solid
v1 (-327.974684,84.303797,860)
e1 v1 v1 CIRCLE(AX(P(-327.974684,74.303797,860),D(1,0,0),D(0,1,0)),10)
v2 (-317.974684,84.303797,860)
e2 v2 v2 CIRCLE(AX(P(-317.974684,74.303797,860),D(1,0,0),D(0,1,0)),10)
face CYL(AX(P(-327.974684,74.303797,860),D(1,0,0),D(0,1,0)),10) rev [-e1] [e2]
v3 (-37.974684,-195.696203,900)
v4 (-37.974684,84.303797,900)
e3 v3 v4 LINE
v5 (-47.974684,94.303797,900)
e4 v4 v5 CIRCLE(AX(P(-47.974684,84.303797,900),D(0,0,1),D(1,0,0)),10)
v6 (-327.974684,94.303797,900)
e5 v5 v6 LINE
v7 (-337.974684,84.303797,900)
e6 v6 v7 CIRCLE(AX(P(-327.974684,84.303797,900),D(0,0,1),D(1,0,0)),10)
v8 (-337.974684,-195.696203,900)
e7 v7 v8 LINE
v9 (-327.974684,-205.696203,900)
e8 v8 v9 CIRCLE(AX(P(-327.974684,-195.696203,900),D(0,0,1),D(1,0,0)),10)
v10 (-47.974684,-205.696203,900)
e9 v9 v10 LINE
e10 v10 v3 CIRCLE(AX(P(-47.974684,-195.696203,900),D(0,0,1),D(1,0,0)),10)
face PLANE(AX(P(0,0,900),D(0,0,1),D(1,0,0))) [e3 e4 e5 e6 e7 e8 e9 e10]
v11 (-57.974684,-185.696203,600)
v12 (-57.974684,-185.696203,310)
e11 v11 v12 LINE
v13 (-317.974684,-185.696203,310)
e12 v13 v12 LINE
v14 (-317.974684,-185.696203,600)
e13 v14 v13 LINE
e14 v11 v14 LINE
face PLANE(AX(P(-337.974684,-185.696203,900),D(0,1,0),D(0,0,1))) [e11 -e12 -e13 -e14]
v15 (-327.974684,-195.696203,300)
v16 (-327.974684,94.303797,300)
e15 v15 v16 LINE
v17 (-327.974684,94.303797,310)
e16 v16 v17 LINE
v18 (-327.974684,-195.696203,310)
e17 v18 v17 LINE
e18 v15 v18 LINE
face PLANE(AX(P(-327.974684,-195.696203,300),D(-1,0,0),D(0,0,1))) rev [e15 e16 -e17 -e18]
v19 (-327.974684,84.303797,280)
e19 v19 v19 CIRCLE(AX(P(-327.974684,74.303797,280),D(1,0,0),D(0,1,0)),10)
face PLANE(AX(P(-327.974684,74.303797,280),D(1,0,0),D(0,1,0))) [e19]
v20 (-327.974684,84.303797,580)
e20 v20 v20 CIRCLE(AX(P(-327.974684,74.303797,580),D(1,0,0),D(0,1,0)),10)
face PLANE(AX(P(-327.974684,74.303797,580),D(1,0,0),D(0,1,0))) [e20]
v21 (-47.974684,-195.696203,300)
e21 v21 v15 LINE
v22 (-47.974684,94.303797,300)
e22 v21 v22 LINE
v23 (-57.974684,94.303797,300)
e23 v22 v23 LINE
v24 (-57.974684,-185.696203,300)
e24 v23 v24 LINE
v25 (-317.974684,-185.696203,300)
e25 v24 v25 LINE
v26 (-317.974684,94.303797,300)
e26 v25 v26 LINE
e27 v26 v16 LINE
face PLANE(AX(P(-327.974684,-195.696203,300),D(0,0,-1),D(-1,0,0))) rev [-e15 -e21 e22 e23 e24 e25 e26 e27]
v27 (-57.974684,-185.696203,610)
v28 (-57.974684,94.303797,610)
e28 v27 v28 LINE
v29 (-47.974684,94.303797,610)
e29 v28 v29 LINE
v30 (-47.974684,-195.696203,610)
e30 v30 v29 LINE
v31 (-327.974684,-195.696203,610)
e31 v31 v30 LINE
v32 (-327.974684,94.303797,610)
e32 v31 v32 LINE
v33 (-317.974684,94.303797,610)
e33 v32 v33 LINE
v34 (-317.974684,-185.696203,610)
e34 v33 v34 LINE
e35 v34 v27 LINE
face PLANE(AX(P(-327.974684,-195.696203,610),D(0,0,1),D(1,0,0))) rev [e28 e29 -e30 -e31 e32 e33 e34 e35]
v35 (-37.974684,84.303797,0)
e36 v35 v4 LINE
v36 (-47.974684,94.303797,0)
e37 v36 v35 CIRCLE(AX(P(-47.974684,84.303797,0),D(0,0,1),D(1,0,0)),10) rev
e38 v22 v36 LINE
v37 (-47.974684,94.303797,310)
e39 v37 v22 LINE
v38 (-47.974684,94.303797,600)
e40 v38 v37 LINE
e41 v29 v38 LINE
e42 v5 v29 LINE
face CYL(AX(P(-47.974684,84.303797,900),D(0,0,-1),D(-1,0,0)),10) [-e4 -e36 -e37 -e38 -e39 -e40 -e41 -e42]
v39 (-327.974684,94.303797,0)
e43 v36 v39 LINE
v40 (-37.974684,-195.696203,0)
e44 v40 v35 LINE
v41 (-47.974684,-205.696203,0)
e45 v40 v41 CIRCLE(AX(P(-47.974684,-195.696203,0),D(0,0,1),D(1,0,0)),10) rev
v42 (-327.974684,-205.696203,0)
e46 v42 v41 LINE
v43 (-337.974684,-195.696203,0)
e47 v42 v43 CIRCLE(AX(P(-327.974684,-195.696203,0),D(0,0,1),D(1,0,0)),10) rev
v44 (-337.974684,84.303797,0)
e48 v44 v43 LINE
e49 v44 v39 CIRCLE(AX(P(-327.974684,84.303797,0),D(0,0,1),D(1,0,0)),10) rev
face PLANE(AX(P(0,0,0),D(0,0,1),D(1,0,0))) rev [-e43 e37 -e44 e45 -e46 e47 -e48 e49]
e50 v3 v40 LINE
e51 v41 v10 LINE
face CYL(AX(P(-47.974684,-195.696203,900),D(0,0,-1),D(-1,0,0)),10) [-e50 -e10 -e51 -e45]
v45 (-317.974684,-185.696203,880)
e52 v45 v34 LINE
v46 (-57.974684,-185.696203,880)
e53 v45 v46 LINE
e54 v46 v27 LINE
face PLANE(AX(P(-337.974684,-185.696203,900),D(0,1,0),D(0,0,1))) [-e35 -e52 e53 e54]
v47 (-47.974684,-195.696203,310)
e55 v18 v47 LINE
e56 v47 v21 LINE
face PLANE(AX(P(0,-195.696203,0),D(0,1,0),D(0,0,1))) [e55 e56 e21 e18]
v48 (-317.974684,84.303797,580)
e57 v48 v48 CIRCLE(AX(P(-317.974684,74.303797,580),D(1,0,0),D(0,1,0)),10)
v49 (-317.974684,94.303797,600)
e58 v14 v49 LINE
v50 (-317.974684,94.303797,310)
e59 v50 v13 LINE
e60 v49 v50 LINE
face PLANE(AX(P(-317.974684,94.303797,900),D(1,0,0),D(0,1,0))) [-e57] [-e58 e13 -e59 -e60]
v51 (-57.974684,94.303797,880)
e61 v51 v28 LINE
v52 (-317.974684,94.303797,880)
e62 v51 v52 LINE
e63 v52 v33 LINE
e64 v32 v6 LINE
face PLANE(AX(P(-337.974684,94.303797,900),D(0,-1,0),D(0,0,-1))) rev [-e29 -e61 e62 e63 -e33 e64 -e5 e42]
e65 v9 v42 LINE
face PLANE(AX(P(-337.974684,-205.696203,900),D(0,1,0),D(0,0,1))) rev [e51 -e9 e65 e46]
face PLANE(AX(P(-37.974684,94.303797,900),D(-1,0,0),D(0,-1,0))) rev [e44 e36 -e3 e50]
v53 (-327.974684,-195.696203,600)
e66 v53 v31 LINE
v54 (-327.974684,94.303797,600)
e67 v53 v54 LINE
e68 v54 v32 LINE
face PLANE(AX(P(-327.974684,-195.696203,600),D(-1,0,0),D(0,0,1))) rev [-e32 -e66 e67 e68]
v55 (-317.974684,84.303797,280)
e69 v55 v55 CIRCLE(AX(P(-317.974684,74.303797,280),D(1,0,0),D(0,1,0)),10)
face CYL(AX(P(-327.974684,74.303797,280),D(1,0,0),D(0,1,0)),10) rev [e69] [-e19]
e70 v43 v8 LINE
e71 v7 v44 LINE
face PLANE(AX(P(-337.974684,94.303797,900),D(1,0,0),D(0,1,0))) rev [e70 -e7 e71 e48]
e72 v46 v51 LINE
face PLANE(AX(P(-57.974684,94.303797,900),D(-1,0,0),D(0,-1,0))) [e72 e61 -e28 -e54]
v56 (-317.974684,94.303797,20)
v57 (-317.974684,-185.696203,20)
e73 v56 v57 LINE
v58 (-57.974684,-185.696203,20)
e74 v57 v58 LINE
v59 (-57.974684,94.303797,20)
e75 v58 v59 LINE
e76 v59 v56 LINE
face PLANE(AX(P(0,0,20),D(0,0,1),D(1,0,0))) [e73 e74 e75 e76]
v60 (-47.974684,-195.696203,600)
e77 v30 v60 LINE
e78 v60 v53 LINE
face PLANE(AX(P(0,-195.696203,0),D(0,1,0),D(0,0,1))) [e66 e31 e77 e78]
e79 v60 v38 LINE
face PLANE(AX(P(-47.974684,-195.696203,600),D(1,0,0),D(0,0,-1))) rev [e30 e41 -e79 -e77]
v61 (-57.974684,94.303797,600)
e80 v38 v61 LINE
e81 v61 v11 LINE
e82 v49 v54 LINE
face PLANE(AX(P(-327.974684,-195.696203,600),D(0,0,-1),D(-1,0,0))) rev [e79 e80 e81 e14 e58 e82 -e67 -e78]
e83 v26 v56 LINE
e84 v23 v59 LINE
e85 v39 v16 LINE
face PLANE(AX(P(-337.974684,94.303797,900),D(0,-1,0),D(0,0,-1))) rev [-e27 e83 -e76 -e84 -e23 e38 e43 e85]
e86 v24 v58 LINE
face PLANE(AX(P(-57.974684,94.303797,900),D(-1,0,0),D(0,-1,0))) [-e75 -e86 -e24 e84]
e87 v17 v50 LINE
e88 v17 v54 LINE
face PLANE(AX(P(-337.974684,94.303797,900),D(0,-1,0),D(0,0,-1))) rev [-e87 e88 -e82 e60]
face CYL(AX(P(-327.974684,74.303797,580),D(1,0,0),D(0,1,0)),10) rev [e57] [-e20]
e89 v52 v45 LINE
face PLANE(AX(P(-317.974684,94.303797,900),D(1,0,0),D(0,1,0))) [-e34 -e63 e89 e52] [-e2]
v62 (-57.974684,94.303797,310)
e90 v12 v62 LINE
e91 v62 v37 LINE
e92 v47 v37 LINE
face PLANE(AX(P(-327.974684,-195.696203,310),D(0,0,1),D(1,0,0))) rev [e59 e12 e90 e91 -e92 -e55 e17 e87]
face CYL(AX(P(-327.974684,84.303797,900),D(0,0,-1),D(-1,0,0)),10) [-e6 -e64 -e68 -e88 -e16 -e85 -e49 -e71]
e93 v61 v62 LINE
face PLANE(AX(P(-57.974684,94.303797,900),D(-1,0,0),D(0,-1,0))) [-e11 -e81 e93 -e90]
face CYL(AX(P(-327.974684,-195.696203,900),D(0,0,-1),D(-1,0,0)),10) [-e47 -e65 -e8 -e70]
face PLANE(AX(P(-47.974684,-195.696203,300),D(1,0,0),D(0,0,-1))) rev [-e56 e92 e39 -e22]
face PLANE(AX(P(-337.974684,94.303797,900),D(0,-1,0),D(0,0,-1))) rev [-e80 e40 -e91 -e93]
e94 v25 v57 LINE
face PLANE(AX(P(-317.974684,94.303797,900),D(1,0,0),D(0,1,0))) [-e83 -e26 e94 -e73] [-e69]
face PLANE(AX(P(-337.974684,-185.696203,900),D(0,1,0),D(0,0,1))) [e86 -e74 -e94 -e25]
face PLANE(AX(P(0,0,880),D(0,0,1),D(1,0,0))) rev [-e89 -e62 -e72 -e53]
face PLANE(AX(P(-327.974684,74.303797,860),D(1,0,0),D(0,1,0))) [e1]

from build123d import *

# Parameters (mm, degrees)
SKETCH1_W           = 300
SKETCH1_H           = 300
BOSS_EXTRUDE1_DEPTH = 900
SHELL1_T            = -20
SKETCH2_W           = 280
SKETCH2_H           = 10
CUT_EXTRUDE1_DEPTH  = 290
SKETCH3_R           = 10
CUT_EXTRUDE2_DEPTH  = 10
FILLET1_START       = -1
FILLET1_DEPTH       = 902


with BuildPart() as part:
    # Sketch1 → Boss-Extrude1 (new body)
    with BuildSketch(Plane.XY):
        with Locations((-187.974683544, -55.696202532)):
            Rectangle(SKETCH1_W, SKETCH1_H)
    extrude(amount=BOSS_EXTRUDE1_DEPTH)

    # Shell1
    shell1_openings = [part.faces().sort_by_distance(p)[0] for p in [
        (-187.974683544, 94.303797468, 450),
    ]]
    offset(amount=SHELL1_T, openings=shell1_openings, kind=Kind.INTERSECTION)

    # Sketch2 → Cut-Extrude1 (cut)
    with BuildSketch(Plane(origin=(0, 94.303797468, 0), x_dir=(1, 0, 0), z_dir=(0, 1, 0))):
        with Locations((-187.974683544, -305)):
            Rectangle(SKETCH2_W, SKETCH2_H)
        with Locations((-187.974683544, -605)):
            Rectangle(SKETCH2_W, SKETCH2_H)
    extrude(amount=-CUT_EXTRUDE1_DEPTH, mode=Mode.SUBTRACT)

    # Sketch3 → Cut-Extrude2 (cut)
    with BuildSketch(Plane(origin=(-317.974683544, 0, 0), x_dir=(0, 0, -1), z_dir=(1, 0, 0))):
        with Locations(Location((-580, 74.303797468, 0), (0, 0, 90))):
            Circle(SKETCH3_R)
        with Locations(Location((-280, 74.303797468, 0), (0, 0, 90))):
            Circle(SKETCH3_R)
        with Locations(Location((-860, 74.303797468, 0), (0, 0, 90))):
            Circle(SKETCH3_R)
    extrude(amount=-CUT_EXTRUDE2_DEPTH, mode=Mode.SUBTRACT)

    # Fillet1: read off the stored shape, not the designer's step
    # Fillet1 outline → Fillet1 (cut)
    with BuildSketch(Plane.XY.offset(FILLET1_START)):
        with BuildLine():
            Line((-37.974683544, 94.303797468), (-47.974683544, 94.303797468))
            ThreePointArc((-47.974683544, 94.303797468), (-40.903615732, 91.37486528), (-37.974683544, 84.303797468))
            Line((-37.974683544, 84.303797468), (-37.974683544, 94.303797468))
        make_face()
        with BuildLine():
            Line((-37.974683544, -205.696202532), (-37.974683544, -195.696202532))
            ThreePointArc((-37.974683544, -195.696202532), (-40.903615732, -202.767270344), (-47.974683544, -205.696202532))
            Line((-47.974683544, -205.696202532), (-37.974683544, -205.696202532))
        make_face()
        with BuildLine():
            ThreePointArc((-337.974683544, 84.303797468), (-335.045751356, 91.37486528), (-327.974683544, 94.303797468))
            Line((-327.974683544, 94.303797468), (-337.974683544, 94.303797468))
            Line((-337.974683544, 94.303797468), (-337.974683544, 84.303797468))
        make_face()
        with BuildLine():
            Line((-337.974683544, -205.696202532), (-327.974683544, -205.696202532))
            ThreePointArc((-327.974683544, -205.696202532), (-335.045751356, -202.767270344), (-337.974683544, -195.696202532))
            Line((-337.974683544, -195.696202532), (-337.974683544, -205.696202532))
        make_face()
    extrude(amount=FILLET1_DEPTH, mode=Mode.SUBTRACT)


solid = part.part
